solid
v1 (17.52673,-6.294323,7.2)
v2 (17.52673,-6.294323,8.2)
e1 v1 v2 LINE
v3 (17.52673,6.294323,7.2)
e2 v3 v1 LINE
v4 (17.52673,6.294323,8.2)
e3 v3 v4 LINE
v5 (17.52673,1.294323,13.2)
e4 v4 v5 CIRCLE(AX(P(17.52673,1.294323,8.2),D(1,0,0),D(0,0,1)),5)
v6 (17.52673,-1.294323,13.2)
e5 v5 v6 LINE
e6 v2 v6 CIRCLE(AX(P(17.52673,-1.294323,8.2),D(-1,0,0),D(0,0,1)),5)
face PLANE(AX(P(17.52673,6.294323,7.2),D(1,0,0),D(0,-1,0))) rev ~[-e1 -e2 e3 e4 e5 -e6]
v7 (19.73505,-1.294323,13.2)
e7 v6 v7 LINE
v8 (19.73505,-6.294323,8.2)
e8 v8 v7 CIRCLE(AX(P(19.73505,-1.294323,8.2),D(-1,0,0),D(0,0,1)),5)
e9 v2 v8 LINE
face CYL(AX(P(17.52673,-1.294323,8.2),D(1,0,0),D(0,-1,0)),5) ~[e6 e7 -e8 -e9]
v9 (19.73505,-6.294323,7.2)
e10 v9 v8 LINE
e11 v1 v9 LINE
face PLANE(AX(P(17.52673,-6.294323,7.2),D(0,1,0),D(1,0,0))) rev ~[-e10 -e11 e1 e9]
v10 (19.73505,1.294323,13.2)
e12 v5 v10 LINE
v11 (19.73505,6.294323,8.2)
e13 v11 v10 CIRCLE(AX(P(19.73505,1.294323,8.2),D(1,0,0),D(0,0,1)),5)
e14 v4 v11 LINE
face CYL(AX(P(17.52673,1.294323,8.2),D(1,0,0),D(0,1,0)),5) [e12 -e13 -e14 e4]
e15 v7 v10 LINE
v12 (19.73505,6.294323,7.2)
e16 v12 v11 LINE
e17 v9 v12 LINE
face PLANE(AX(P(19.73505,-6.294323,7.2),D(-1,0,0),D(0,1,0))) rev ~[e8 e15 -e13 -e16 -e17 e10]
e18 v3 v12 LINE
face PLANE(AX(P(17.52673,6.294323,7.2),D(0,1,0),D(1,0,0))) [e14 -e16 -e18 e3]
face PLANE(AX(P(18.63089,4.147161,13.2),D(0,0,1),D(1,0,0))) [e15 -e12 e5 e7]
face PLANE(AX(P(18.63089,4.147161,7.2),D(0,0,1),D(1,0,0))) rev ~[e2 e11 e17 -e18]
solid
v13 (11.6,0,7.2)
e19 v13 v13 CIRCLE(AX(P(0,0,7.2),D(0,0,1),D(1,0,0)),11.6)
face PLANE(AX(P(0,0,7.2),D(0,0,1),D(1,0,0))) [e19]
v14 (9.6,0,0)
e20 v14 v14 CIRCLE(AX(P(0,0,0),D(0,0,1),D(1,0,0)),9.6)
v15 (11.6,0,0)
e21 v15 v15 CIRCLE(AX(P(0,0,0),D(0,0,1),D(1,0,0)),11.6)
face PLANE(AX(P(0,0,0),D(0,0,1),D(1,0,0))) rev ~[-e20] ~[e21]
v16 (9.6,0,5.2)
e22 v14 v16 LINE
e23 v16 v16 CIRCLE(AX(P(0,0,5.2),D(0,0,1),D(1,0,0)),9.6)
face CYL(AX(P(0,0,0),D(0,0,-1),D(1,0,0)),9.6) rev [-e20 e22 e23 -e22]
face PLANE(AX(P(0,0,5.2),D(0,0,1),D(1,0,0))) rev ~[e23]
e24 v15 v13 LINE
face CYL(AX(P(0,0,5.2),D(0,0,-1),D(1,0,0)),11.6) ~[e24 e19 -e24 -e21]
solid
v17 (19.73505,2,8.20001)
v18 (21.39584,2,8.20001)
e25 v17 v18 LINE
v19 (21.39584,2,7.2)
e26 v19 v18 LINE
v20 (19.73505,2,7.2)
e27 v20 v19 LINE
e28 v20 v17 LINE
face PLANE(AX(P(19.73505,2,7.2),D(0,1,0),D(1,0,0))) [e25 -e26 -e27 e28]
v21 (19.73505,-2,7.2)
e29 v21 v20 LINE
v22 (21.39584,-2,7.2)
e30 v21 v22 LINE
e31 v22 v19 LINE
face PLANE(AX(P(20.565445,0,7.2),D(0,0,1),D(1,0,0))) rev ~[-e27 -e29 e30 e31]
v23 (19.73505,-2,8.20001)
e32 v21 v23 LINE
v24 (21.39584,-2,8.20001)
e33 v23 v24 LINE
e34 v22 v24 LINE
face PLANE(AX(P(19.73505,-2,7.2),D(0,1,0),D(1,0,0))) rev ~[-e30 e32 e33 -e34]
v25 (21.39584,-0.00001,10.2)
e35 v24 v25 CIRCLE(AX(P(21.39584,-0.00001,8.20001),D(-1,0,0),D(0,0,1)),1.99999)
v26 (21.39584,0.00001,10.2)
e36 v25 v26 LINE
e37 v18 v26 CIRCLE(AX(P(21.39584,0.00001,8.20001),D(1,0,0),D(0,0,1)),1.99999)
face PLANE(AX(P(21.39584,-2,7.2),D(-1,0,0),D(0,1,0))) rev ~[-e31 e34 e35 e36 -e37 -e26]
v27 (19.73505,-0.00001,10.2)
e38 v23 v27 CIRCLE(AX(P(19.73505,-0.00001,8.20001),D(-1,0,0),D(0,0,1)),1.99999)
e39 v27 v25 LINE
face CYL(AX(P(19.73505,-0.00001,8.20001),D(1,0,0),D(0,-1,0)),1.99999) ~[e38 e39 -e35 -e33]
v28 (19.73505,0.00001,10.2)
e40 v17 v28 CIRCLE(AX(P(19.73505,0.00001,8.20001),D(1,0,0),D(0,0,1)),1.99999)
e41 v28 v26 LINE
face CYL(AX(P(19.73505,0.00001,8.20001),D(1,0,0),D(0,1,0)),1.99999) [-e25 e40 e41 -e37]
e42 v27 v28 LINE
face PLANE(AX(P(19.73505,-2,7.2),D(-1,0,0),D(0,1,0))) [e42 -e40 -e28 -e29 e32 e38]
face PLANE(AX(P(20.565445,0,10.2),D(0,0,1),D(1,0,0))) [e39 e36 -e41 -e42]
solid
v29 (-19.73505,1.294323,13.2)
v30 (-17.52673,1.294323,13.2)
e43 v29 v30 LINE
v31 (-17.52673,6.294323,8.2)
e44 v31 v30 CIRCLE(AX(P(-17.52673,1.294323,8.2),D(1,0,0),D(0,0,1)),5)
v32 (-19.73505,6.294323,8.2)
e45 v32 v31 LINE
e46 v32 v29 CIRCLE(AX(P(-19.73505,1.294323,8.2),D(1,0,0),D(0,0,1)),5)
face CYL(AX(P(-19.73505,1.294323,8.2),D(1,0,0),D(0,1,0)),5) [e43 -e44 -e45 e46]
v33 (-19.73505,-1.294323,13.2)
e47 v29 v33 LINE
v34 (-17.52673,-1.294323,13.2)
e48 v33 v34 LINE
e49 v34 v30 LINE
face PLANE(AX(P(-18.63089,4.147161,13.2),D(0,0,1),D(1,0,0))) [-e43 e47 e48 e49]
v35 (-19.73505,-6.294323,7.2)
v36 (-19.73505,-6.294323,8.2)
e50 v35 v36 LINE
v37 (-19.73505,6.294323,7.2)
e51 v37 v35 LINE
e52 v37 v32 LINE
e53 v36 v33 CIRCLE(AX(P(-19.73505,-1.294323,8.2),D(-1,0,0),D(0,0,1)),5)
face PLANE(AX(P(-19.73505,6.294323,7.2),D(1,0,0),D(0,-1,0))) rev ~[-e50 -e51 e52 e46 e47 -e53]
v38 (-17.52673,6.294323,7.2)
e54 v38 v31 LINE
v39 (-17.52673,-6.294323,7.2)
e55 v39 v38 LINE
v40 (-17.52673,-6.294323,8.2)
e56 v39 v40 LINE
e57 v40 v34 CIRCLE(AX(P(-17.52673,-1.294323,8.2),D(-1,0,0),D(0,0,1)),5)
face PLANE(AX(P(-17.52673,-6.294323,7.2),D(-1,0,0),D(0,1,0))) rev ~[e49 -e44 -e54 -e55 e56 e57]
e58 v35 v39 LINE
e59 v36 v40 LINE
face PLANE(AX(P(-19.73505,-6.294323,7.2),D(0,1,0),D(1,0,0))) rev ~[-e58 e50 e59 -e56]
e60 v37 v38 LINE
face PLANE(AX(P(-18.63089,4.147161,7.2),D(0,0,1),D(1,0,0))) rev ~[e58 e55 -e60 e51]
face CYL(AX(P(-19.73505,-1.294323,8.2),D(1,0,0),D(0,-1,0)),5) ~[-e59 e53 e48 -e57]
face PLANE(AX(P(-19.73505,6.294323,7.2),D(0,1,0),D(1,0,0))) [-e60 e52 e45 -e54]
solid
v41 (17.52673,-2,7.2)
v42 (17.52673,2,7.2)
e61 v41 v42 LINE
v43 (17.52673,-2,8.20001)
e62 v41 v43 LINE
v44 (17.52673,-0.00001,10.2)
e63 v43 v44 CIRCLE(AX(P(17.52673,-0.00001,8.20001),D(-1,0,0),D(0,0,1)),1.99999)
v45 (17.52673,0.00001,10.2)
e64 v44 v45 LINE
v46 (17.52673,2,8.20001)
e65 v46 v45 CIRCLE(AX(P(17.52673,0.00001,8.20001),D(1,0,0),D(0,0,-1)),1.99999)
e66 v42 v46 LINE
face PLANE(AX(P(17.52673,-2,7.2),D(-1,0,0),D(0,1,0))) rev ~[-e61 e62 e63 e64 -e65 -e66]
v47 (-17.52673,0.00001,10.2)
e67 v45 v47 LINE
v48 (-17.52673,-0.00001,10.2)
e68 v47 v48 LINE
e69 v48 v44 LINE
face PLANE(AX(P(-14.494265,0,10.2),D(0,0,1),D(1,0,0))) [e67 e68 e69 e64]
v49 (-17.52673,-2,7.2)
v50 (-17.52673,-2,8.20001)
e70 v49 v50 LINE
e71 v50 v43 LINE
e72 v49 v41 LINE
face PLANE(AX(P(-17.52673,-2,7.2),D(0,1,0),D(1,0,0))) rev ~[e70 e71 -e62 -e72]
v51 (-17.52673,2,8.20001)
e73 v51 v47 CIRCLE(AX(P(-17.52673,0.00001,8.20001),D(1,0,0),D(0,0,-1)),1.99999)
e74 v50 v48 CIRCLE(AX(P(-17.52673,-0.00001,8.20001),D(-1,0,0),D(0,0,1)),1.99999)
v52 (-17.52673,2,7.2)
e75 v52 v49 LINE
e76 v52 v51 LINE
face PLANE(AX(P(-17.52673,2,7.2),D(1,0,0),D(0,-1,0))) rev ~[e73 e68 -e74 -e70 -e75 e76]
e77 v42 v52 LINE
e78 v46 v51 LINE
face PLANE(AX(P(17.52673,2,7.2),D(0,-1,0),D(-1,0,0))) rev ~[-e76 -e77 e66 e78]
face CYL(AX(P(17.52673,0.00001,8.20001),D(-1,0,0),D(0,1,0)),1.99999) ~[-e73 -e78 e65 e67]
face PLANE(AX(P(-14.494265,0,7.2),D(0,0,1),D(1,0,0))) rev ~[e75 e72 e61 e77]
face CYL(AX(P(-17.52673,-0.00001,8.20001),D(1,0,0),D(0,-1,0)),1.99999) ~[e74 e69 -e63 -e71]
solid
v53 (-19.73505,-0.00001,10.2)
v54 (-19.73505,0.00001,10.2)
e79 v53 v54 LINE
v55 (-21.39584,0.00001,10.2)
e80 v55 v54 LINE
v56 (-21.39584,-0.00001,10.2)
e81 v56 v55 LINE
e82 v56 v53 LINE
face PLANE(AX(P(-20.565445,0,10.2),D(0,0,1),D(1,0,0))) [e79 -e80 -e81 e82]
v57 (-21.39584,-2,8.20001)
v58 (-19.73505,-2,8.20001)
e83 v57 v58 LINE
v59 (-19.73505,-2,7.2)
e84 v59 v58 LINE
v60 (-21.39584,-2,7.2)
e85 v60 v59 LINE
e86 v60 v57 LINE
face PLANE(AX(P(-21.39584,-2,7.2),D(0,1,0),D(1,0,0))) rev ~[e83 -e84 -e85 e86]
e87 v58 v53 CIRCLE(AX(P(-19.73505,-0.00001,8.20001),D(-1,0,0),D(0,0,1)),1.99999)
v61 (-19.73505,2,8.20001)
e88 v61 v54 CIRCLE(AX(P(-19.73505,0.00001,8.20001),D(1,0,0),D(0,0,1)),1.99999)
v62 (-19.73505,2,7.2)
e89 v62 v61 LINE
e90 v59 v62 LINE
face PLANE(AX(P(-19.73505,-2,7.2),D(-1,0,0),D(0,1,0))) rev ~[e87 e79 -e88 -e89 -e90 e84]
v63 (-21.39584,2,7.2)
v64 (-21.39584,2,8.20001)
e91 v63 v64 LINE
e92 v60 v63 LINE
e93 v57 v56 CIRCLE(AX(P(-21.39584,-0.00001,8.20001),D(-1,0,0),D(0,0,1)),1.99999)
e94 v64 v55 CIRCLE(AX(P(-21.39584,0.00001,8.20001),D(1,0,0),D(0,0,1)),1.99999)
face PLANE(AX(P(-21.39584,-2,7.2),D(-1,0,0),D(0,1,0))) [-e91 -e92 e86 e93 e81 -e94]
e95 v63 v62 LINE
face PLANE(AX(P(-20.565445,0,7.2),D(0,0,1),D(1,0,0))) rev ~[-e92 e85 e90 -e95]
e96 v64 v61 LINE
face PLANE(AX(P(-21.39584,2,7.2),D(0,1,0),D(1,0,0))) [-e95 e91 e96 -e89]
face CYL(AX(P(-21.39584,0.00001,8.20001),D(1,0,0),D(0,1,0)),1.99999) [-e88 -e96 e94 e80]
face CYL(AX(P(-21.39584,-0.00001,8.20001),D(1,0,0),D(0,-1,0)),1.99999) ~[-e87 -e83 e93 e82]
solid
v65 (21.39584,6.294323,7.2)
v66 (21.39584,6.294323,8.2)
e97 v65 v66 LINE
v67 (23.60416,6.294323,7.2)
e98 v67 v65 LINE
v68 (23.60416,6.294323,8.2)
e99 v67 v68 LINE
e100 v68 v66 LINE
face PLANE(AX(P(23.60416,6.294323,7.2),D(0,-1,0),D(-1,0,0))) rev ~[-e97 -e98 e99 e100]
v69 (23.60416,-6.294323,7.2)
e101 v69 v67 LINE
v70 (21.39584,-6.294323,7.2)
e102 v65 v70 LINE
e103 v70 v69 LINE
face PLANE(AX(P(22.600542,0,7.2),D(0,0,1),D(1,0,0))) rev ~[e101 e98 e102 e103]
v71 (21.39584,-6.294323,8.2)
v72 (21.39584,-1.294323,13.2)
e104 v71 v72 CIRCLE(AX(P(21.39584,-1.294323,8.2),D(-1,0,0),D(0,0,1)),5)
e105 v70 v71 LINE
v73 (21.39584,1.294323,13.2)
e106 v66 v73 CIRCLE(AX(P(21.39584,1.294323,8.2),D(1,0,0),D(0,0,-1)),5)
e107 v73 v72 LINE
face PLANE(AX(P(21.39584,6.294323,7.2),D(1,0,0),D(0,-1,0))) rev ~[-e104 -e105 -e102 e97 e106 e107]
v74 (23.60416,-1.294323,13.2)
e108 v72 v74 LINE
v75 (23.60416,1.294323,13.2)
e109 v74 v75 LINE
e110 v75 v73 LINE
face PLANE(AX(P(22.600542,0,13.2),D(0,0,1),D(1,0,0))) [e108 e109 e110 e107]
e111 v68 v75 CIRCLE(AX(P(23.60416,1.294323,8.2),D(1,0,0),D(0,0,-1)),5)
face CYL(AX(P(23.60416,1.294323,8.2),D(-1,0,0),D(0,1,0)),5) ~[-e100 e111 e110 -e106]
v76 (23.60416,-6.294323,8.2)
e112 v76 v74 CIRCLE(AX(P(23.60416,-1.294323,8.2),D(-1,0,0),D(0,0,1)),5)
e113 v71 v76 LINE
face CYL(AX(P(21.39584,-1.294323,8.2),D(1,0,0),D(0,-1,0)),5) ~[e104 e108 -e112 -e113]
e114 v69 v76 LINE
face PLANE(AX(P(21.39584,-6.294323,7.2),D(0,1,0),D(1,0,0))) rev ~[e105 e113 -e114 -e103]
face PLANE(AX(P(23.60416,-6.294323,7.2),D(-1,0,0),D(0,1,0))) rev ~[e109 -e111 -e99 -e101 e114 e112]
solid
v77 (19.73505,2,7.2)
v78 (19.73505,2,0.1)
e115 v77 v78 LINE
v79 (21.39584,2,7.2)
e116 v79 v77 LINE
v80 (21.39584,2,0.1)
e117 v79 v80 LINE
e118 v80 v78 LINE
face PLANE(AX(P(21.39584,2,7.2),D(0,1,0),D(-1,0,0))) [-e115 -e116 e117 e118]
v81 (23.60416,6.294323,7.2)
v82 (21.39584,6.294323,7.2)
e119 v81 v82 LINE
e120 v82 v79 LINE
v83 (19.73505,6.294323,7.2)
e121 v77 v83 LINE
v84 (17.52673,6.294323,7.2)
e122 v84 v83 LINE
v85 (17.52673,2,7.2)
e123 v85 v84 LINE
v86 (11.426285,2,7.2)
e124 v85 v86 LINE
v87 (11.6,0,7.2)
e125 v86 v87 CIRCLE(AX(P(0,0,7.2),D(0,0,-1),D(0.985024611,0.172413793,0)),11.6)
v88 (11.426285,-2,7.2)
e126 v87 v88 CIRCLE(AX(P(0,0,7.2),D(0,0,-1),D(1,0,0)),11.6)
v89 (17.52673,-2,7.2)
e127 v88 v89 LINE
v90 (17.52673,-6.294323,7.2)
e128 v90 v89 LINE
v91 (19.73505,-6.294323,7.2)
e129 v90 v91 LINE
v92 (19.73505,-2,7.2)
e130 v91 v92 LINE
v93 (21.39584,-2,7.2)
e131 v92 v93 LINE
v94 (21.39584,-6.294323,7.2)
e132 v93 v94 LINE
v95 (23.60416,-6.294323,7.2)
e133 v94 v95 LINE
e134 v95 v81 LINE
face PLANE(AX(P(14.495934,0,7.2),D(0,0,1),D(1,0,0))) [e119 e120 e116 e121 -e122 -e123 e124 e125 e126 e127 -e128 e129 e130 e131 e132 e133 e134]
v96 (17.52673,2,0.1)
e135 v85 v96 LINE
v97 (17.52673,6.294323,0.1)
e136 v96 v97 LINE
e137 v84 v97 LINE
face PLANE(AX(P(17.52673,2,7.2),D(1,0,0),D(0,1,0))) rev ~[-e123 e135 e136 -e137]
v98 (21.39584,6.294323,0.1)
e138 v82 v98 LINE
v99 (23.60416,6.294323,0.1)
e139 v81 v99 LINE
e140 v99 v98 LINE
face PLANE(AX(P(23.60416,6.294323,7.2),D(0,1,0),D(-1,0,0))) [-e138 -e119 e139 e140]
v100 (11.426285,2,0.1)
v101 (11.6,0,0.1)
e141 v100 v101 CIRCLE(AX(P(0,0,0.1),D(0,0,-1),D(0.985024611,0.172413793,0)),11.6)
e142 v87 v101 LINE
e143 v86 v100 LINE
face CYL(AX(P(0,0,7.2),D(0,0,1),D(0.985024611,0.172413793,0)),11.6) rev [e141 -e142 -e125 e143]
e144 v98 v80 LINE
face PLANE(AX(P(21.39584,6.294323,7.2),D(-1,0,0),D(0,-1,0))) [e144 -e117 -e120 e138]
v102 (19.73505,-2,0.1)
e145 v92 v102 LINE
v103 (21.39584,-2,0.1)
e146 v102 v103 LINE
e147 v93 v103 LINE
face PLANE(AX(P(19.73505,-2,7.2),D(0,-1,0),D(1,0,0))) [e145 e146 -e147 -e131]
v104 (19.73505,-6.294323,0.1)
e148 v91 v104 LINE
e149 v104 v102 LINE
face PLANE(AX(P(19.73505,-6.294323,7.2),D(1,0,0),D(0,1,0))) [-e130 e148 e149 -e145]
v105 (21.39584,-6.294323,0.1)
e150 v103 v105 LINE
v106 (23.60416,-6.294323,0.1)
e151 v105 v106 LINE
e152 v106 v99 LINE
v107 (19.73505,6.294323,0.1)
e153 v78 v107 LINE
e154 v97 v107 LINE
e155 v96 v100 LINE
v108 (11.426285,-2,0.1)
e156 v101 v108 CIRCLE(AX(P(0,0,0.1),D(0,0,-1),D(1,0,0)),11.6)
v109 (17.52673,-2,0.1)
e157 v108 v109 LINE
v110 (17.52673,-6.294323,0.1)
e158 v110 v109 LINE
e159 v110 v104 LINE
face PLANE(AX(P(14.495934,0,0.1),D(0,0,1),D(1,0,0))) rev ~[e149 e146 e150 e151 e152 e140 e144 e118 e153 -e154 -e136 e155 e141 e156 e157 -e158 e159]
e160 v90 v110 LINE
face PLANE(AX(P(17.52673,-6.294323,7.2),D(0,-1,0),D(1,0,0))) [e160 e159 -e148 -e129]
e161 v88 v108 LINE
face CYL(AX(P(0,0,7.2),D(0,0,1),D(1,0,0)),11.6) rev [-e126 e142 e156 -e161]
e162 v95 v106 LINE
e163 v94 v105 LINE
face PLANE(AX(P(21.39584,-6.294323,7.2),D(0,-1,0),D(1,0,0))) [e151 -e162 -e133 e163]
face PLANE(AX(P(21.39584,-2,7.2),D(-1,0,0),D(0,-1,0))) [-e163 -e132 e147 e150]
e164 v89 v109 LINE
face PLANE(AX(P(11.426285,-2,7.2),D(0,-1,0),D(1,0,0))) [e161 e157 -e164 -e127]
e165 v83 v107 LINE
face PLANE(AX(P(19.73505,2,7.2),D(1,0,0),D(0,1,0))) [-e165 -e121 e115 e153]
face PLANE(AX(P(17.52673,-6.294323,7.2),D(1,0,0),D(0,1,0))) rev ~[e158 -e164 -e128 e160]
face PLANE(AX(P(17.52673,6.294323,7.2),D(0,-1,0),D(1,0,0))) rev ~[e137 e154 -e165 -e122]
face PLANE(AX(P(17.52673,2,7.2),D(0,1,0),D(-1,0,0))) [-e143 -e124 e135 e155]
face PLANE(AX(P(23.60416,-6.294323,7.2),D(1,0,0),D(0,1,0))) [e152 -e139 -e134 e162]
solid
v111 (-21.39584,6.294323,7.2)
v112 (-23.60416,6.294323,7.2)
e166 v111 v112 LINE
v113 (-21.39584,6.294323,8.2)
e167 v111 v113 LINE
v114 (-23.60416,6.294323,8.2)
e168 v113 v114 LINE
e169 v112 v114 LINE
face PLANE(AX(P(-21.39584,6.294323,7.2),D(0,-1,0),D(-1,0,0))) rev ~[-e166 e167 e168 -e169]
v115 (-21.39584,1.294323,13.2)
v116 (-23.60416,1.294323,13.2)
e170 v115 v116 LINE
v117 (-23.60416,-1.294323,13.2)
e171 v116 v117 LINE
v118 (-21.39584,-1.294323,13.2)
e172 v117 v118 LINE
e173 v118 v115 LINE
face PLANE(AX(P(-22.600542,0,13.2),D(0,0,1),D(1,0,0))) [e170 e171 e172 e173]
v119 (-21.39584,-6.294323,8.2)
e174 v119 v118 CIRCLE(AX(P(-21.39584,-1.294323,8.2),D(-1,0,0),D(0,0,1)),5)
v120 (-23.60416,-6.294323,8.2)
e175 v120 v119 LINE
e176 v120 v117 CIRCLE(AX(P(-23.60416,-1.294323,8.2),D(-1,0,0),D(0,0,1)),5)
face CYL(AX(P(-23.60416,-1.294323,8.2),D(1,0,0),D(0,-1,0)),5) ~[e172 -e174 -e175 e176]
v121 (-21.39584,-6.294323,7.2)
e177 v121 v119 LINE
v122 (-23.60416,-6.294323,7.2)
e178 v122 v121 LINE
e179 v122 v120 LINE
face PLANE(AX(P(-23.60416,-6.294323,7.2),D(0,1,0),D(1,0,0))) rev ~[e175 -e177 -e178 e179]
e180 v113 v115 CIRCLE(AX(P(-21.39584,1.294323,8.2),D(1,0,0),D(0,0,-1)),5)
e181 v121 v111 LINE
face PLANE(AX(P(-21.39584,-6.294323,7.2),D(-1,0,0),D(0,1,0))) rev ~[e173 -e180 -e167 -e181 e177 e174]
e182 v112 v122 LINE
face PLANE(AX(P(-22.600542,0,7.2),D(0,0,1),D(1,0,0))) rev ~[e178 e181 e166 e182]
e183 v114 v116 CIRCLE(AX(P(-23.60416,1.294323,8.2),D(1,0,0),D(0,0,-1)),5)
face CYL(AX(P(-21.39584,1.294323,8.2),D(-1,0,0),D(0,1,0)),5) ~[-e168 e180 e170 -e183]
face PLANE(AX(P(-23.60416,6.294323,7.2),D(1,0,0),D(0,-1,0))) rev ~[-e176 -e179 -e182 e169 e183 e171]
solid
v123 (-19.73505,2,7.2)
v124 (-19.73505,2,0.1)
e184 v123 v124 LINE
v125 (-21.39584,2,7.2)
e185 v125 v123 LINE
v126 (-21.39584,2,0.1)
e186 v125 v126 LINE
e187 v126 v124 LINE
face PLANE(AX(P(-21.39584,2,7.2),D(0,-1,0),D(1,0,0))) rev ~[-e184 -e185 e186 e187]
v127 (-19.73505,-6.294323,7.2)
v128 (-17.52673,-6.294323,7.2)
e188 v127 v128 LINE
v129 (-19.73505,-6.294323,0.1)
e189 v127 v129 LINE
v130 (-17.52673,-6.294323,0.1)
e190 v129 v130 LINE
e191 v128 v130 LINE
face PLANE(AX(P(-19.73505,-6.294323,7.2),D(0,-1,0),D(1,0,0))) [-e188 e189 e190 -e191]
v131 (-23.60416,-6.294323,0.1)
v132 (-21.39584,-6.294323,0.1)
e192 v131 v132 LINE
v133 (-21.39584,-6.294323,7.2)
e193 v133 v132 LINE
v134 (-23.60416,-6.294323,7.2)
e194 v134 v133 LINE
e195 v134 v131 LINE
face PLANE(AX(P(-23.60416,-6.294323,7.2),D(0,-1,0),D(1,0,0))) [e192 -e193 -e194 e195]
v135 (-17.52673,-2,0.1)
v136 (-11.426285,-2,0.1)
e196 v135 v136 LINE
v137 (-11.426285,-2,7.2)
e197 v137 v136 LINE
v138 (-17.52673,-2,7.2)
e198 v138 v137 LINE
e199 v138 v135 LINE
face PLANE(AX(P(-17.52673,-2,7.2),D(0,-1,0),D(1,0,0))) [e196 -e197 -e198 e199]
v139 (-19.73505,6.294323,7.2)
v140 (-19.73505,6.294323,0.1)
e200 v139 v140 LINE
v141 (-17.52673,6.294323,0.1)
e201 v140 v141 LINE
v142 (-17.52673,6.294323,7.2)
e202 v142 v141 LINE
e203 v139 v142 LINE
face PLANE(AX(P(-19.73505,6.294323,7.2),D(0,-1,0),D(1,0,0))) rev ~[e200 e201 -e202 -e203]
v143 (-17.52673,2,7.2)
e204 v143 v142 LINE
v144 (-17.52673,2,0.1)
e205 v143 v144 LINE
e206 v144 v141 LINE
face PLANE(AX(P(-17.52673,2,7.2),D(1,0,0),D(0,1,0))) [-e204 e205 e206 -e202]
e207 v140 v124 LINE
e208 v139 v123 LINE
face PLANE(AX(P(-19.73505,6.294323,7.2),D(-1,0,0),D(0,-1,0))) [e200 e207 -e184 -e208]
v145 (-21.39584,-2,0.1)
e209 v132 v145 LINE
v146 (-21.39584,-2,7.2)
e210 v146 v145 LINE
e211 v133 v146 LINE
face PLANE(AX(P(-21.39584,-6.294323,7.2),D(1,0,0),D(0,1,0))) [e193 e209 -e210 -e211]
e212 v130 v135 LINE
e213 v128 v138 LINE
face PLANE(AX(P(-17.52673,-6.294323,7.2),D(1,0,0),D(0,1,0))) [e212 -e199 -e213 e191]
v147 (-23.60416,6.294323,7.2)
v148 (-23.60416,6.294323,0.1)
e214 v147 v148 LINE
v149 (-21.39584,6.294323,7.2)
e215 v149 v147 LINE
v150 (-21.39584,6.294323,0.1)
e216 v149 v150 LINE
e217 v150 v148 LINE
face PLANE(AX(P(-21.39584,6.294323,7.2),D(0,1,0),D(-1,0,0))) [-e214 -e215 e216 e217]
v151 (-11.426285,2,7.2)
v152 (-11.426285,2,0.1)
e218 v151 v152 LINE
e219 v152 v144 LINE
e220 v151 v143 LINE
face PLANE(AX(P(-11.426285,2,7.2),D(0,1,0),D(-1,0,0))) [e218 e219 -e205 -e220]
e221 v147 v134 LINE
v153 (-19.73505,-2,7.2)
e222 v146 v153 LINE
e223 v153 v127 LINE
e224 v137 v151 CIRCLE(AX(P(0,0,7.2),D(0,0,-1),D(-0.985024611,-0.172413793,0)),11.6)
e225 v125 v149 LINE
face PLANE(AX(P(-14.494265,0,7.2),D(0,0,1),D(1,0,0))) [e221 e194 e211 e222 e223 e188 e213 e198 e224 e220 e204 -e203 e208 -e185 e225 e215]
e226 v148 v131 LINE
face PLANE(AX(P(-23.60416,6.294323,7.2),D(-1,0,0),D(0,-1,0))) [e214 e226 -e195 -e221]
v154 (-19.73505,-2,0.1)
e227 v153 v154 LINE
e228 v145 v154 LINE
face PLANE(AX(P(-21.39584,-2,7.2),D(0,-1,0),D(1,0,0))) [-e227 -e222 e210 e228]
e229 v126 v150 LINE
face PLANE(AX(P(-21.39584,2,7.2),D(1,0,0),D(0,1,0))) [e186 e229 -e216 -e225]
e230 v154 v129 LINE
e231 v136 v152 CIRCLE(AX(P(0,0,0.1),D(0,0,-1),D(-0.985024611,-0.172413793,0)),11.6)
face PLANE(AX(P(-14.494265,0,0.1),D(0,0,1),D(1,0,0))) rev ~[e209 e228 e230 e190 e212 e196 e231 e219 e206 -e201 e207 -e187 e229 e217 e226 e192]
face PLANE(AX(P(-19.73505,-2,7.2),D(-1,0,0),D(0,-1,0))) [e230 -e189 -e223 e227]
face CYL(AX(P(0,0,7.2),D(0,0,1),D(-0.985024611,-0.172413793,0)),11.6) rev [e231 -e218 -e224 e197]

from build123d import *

# Parameters (mm, degrees)
F0_R     = 11.6
F0_R_2   = 9.6
F1_DEPTH = 5.2
F2_R     = 11.6
F2_R_2   = 9.6
F3_DEPTH = 2
F4_W     = 2.2083204985
F4_H     = 4
F4_H_2   = 4.2943226658
F4_W_2   = 1.1041602492
F4_W_3   = 1.6607893258
F5_DEPTH = 7.1
F6_DEPTH = 3
F7_DEPTH = 6
F8_R     = 5
F8_2_R   = 5
F8_3_R   = 5
F8_4_R   = 5
F9_R     = 1.99999
F9_2_R   = 1.99999
F9_3_R   = 1.99999


# Not quite as in the source:
# - a fillet or chamfer is up to 0.001 mm smaller than in the source, because OpenCascade refuses the exact size


with BuildPart() as f1:
    # F0 (on Top) → F1 (new body)
    with BuildSketch(Plane.XY):
        Circle(F0_R)
        Circle(F0_R_2, mode=Mode.SUBTRACT)
    extrude(amount=F1_DEPTH)

    # F2 (on face) → F3 (join)
    with BuildSketch(Plane.XY.offset(5.2)):
        Circle(F2_R)
        Circle(F2_R_2, mode=Mode.SUBTRACT)
        Circle(F2_R_2)
    extrude(amount=F3_DEPTH)


with BuildPart() as f5:
    # F4 (on face) → F5 (new body)
    with BuildSketch(Plane.XY.offset(7.2)):
        with BuildLine():
            Line((-11.4262854857, 2), (-17.5267299265, 2))
            Line((-17.5267299265, 2), (-17.5267299265, -2))
            Line((-17.5267299265, -2), (-11.4262854857, -2))
            ThreePointArc((-11.4262854857, -2), (-11.6, 0), (-11.4262854857, 2))
        make_face()
        with Locations((-18.6308901757, 0)):
            Rectangle(F4_W, F4_H)
        with Locations((-18.6308901757, -4.1471613329)):
            Rectangle(F4_W, F4_H_2)
        Polygon((-22.5, -2), (-22.5, 2), (-21.3958397508, 2), (-21.3958397508, 6.2943226658), (-23.6041602492, 6.2943226658), (-23.6041602492, -6.2943226658), (-21.3958397508, -6.2943226658), (-21.3958397508, -2), align=None)
        with Locations((-21.9479198754, 0)):
            Rectangle(F4_W_2, F4_H)
        with Locations((-18.6308901757, 4.1471613329)):
            Rectangle(F4_W, F4_H_2)
        with Locations((-20.5654450879, 0)):
            Rectangle(F4_W_3, F4_H)
    extrude(amount=-F5_DEPTH)


with BuildPart() as f5b:
    # F4 (on face) → F5, piece 2 (new body)
    with BuildSketch(Plane.XY.offset(7.2)):
        with BuildLine():
            Line((17.5267299265, 2), (11.4262854857, 2))
            ThreePointArc((11.4262854857, 2), (11.5564897706, 1.0037650039), (11.6, 0))
            ThreePointArc((11.6, 0), (11.5564897706, -1.0037650039), (11.4262854857, -2))
            Line((11.4262854857, -2), (17.5267299265, -2))
            Line((17.5267299265, -2), (17.5267299265, 2))
        make_face()
        with Locations((18.6308901757, 0)):
            Rectangle(F4_W, F4_H)
        with Locations((18.6308901757, -4.1471613329)):
            Rectangle(F4_W, F4_H_2)
        Polygon((21.3958397508, 6.2943226658), (21.3958397508, 2), (22.5, 2), (22.5, -2), (21.3958397508, -2), (21.3958397508, -6.2943226658), (23.6041602492, -6.2943226658), (23.6041602492, 6.2943226658), align=None)
        with Locations((20.5654450879, 0)):
            Rectangle(F4_W_3, F4_H)
        with Locations((18.6308901757, 4.1471613329)):
            Rectangle(F4_W, F4_H_2)
        with Locations((21.9479198754, 0)):
            Rectangle(F4_W_2, F4_H)
    extrude(amount=-F5_DEPTH)


with BuildPart() as f6:
    # F4 (on face) → F6 (new body)
    with BuildSketch(Plane.XY.offset(7.2)):
        with BuildLine():
            Line((-11.4262854857, 2), (-17.5267299265, 2))
            Line((-17.5267299265, 2), (-17.5267299265, -2))
            Line((-17.5267299265, -2), (-11.4262854857, -2))
            ThreePointArc((-11.4262854857, -2), (-11.6, 0), (-11.4262854857, 2))
        make_face()
        with BuildLine():
            Line((11.4262854857, 2), (-11.4262854857, 2))
            ThreePointArc((-11.4262854857, 2), (-11.6, 0), (-11.4262854857, -2))
            Line((-11.4262854857, -2), (11.4262854857, -2))
            ThreePointArc((11.4262854857, -2), (11.5564897706, -1.0037650039), (11.6, 0))
            ThreePointArc((11.6, 0), (11.5564897706, 1.0037650039), (11.4262854857, 2))
        make_face()
        with BuildLine():
            Line((17.5267299265, 2), (11.4262854857, 2))
            ThreePointArc((11.4262854857, 2), (11.5564897706, 1.0037650039), (11.6, 0))
            ThreePointArc((11.6, 0), (11.5564897706, -1.0037650039), (11.4262854857, -2))
            Line((11.4262854857, -2), (17.5267299265, -2))
            Line((17.5267299265, -2), (17.5267299265, 2))
        make_face()
    extrude(amount=F6_DEPTH)

    # F9 (radius 2 in the source; OpenCascade refuses exactly that, so slightly less here)
    f9_edges = [f6.edges().sort_by_distance(p)[0] for p in [
        (0, -2, 10.2),
        (0, 2, 10.2),
    ]]
    fillet(f9_edges, radius=F9_R)


with BuildPart() as f6b:
    # F4 (on face) → F6, piece 2 (new body)
    with BuildSketch(Plane.XY.offset(7.2)):
        with Locations((-20.5654450879, 0)):
            Rectangle(F4_W_3, F4_H)
    extrude(amount=F6_DEPTH)

    # F9#3 (radius 2 in the source; OpenCascade refuses exactly that, so slightly less here)
    f9_3_edges = [f6b.edges().sort_by_distance(p)[0] for p in [
        (-20.565445, -2, 10.2),
        (-20.565445, 2, 10.2),
    ]]
    fillet(f9_3_edges, radius=F9_3_R)


with BuildPart() as f6c:
    # F4 (on face) → F6, piece 3 (new body)
    with BuildSketch(Plane.XY.offset(7.2)):
        with Locations((20.5654450879, 0)):
            Rectangle(F4_W_3, F4_H)
    extrude(amount=F6_DEPTH)

    # F9#2 (radius 2 in the source; OpenCascade refuses exactly that, so slightly less here)
    f9_2_edges = [f6c.edges().sort_by_distance(p)[0] for p in [
        (20.565445, -2, 10.2),
        (20.565445, 2, 10.2),
    ]]
    fillet(f9_2_edges, radius=F9_2_R)


with BuildPart() as f7:
    # F4 (on face) → F7 (new body)
    with BuildSketch(Plane.XY.offset(7.2)):
        Polygon((-22.5, -2), (-22.5, 2), (-21.3958397508, 2), (-21.3958397508, 6.2943226658), (-23.6041602492, 6.2943226658), (-23.6041602492, -6.2943226658), (-21.3958397508, -6.2943226658), (-21.3958397508, -2), align=None)
        with Locations((-21.9479198754, 0)):
            Rectangle(F4_W_2, F4_H)
    extrude(amount=F7_DEPTH)

    # F8
    f8_edges = [f7.edges().sort_by_distance(p)[0] for p in [
        (-22.5, 6.294323, 13.2),
        (-22.5, -6.294323, 13.2),
    ]]
    fillet(f8_edges, radius=F8_R)


with BuildPart() as f7b:
    # F4 (on face) → F7, piece 2 (new body)
    with BuildSketch(Plane.XY.offset(7.2)):
        with Locations((-18.6308901757, 4.1471613329)):
            Rectangle(F4_W, F4_H_2)
        with Locations((-18.6308901757, 0)):
            Rectangle(F4_W, F4_H)
        with Locations((-18.6308901757, -4.1471613329)):
            Rectangle(F4_W, F4_H_2)
    extrude(amount=F7_DEPTH)

    # F8#2
    f8_2_edges = [f7b.edges().sort_by_distance(p)[0] for p in [
        (-18.63089, 6.294323, 13.2),
        (-18.63089, -6.294323, 13.2),
    ]]
    fillet(f8_2_edges, radius=F8_2_R)


with BuildPart() as f7c:
    # F4 (on face) → F7, piece 3 (new body)
    with BuildSketch(Plane.XY.offset(7.2)):
        with Locations((18.6308901757, 4.1471613329)):
            Rectangle(F4_W, F4_H_2)
        with Locations((18.6308901757, 0)):
            Rectangle(F4_W, F4_H)
        with Locations((18.6308901757, -4.1471613329)):
            Rectangle(F4_W, F4_H_2)
    extrude(amount=F7_DEPTH)

    # F8#3
    f8_3_edges = [f7c.edges().sort_by_distance(p)[0] for p in [
        (18.63089, -6.294323, 13.2),
        (18.63089, 6.294323, 13.2),
    ]]
    fillet(f8_3_edges, radius=F8_3_R)


with BuildPart() as f7d:
    # F4 (on face) → F7, piece 4 (new body)
    with BuildSketch(Plane.XY.offset(7.2)):
        Polygon((21.3958397508, 6.2943226658), (21.3958397508, 2), (22.5, 2), (22.5, -2), (21.3958397508, -2), (21.3958397508, -6.2943226658), (23.6041602492, -6.2943226658), (23.6041602492, 6.2943226658), align=None)
        with Locations((21.9479198754, 0)):
            Rectangle(F4_W_2, F4_H)
    extrude(amount=F7_DEPTH)

    # F8#4
    f8_4_edges = [f7d.edges().sort_by_distance(p)[0] for p in [
        (22.5, -6.294323, 13.2),
        (22.5, 6.294323, 13.2),
    ]]
    fillet(f8_4_edges, radius=F8_4_R)


solid = Compound([f1.part, f5.part, f5b.part, f6.part, f6b.part, f6c.part, f7.part, f7b.part, f7c.part, f7d.part])
